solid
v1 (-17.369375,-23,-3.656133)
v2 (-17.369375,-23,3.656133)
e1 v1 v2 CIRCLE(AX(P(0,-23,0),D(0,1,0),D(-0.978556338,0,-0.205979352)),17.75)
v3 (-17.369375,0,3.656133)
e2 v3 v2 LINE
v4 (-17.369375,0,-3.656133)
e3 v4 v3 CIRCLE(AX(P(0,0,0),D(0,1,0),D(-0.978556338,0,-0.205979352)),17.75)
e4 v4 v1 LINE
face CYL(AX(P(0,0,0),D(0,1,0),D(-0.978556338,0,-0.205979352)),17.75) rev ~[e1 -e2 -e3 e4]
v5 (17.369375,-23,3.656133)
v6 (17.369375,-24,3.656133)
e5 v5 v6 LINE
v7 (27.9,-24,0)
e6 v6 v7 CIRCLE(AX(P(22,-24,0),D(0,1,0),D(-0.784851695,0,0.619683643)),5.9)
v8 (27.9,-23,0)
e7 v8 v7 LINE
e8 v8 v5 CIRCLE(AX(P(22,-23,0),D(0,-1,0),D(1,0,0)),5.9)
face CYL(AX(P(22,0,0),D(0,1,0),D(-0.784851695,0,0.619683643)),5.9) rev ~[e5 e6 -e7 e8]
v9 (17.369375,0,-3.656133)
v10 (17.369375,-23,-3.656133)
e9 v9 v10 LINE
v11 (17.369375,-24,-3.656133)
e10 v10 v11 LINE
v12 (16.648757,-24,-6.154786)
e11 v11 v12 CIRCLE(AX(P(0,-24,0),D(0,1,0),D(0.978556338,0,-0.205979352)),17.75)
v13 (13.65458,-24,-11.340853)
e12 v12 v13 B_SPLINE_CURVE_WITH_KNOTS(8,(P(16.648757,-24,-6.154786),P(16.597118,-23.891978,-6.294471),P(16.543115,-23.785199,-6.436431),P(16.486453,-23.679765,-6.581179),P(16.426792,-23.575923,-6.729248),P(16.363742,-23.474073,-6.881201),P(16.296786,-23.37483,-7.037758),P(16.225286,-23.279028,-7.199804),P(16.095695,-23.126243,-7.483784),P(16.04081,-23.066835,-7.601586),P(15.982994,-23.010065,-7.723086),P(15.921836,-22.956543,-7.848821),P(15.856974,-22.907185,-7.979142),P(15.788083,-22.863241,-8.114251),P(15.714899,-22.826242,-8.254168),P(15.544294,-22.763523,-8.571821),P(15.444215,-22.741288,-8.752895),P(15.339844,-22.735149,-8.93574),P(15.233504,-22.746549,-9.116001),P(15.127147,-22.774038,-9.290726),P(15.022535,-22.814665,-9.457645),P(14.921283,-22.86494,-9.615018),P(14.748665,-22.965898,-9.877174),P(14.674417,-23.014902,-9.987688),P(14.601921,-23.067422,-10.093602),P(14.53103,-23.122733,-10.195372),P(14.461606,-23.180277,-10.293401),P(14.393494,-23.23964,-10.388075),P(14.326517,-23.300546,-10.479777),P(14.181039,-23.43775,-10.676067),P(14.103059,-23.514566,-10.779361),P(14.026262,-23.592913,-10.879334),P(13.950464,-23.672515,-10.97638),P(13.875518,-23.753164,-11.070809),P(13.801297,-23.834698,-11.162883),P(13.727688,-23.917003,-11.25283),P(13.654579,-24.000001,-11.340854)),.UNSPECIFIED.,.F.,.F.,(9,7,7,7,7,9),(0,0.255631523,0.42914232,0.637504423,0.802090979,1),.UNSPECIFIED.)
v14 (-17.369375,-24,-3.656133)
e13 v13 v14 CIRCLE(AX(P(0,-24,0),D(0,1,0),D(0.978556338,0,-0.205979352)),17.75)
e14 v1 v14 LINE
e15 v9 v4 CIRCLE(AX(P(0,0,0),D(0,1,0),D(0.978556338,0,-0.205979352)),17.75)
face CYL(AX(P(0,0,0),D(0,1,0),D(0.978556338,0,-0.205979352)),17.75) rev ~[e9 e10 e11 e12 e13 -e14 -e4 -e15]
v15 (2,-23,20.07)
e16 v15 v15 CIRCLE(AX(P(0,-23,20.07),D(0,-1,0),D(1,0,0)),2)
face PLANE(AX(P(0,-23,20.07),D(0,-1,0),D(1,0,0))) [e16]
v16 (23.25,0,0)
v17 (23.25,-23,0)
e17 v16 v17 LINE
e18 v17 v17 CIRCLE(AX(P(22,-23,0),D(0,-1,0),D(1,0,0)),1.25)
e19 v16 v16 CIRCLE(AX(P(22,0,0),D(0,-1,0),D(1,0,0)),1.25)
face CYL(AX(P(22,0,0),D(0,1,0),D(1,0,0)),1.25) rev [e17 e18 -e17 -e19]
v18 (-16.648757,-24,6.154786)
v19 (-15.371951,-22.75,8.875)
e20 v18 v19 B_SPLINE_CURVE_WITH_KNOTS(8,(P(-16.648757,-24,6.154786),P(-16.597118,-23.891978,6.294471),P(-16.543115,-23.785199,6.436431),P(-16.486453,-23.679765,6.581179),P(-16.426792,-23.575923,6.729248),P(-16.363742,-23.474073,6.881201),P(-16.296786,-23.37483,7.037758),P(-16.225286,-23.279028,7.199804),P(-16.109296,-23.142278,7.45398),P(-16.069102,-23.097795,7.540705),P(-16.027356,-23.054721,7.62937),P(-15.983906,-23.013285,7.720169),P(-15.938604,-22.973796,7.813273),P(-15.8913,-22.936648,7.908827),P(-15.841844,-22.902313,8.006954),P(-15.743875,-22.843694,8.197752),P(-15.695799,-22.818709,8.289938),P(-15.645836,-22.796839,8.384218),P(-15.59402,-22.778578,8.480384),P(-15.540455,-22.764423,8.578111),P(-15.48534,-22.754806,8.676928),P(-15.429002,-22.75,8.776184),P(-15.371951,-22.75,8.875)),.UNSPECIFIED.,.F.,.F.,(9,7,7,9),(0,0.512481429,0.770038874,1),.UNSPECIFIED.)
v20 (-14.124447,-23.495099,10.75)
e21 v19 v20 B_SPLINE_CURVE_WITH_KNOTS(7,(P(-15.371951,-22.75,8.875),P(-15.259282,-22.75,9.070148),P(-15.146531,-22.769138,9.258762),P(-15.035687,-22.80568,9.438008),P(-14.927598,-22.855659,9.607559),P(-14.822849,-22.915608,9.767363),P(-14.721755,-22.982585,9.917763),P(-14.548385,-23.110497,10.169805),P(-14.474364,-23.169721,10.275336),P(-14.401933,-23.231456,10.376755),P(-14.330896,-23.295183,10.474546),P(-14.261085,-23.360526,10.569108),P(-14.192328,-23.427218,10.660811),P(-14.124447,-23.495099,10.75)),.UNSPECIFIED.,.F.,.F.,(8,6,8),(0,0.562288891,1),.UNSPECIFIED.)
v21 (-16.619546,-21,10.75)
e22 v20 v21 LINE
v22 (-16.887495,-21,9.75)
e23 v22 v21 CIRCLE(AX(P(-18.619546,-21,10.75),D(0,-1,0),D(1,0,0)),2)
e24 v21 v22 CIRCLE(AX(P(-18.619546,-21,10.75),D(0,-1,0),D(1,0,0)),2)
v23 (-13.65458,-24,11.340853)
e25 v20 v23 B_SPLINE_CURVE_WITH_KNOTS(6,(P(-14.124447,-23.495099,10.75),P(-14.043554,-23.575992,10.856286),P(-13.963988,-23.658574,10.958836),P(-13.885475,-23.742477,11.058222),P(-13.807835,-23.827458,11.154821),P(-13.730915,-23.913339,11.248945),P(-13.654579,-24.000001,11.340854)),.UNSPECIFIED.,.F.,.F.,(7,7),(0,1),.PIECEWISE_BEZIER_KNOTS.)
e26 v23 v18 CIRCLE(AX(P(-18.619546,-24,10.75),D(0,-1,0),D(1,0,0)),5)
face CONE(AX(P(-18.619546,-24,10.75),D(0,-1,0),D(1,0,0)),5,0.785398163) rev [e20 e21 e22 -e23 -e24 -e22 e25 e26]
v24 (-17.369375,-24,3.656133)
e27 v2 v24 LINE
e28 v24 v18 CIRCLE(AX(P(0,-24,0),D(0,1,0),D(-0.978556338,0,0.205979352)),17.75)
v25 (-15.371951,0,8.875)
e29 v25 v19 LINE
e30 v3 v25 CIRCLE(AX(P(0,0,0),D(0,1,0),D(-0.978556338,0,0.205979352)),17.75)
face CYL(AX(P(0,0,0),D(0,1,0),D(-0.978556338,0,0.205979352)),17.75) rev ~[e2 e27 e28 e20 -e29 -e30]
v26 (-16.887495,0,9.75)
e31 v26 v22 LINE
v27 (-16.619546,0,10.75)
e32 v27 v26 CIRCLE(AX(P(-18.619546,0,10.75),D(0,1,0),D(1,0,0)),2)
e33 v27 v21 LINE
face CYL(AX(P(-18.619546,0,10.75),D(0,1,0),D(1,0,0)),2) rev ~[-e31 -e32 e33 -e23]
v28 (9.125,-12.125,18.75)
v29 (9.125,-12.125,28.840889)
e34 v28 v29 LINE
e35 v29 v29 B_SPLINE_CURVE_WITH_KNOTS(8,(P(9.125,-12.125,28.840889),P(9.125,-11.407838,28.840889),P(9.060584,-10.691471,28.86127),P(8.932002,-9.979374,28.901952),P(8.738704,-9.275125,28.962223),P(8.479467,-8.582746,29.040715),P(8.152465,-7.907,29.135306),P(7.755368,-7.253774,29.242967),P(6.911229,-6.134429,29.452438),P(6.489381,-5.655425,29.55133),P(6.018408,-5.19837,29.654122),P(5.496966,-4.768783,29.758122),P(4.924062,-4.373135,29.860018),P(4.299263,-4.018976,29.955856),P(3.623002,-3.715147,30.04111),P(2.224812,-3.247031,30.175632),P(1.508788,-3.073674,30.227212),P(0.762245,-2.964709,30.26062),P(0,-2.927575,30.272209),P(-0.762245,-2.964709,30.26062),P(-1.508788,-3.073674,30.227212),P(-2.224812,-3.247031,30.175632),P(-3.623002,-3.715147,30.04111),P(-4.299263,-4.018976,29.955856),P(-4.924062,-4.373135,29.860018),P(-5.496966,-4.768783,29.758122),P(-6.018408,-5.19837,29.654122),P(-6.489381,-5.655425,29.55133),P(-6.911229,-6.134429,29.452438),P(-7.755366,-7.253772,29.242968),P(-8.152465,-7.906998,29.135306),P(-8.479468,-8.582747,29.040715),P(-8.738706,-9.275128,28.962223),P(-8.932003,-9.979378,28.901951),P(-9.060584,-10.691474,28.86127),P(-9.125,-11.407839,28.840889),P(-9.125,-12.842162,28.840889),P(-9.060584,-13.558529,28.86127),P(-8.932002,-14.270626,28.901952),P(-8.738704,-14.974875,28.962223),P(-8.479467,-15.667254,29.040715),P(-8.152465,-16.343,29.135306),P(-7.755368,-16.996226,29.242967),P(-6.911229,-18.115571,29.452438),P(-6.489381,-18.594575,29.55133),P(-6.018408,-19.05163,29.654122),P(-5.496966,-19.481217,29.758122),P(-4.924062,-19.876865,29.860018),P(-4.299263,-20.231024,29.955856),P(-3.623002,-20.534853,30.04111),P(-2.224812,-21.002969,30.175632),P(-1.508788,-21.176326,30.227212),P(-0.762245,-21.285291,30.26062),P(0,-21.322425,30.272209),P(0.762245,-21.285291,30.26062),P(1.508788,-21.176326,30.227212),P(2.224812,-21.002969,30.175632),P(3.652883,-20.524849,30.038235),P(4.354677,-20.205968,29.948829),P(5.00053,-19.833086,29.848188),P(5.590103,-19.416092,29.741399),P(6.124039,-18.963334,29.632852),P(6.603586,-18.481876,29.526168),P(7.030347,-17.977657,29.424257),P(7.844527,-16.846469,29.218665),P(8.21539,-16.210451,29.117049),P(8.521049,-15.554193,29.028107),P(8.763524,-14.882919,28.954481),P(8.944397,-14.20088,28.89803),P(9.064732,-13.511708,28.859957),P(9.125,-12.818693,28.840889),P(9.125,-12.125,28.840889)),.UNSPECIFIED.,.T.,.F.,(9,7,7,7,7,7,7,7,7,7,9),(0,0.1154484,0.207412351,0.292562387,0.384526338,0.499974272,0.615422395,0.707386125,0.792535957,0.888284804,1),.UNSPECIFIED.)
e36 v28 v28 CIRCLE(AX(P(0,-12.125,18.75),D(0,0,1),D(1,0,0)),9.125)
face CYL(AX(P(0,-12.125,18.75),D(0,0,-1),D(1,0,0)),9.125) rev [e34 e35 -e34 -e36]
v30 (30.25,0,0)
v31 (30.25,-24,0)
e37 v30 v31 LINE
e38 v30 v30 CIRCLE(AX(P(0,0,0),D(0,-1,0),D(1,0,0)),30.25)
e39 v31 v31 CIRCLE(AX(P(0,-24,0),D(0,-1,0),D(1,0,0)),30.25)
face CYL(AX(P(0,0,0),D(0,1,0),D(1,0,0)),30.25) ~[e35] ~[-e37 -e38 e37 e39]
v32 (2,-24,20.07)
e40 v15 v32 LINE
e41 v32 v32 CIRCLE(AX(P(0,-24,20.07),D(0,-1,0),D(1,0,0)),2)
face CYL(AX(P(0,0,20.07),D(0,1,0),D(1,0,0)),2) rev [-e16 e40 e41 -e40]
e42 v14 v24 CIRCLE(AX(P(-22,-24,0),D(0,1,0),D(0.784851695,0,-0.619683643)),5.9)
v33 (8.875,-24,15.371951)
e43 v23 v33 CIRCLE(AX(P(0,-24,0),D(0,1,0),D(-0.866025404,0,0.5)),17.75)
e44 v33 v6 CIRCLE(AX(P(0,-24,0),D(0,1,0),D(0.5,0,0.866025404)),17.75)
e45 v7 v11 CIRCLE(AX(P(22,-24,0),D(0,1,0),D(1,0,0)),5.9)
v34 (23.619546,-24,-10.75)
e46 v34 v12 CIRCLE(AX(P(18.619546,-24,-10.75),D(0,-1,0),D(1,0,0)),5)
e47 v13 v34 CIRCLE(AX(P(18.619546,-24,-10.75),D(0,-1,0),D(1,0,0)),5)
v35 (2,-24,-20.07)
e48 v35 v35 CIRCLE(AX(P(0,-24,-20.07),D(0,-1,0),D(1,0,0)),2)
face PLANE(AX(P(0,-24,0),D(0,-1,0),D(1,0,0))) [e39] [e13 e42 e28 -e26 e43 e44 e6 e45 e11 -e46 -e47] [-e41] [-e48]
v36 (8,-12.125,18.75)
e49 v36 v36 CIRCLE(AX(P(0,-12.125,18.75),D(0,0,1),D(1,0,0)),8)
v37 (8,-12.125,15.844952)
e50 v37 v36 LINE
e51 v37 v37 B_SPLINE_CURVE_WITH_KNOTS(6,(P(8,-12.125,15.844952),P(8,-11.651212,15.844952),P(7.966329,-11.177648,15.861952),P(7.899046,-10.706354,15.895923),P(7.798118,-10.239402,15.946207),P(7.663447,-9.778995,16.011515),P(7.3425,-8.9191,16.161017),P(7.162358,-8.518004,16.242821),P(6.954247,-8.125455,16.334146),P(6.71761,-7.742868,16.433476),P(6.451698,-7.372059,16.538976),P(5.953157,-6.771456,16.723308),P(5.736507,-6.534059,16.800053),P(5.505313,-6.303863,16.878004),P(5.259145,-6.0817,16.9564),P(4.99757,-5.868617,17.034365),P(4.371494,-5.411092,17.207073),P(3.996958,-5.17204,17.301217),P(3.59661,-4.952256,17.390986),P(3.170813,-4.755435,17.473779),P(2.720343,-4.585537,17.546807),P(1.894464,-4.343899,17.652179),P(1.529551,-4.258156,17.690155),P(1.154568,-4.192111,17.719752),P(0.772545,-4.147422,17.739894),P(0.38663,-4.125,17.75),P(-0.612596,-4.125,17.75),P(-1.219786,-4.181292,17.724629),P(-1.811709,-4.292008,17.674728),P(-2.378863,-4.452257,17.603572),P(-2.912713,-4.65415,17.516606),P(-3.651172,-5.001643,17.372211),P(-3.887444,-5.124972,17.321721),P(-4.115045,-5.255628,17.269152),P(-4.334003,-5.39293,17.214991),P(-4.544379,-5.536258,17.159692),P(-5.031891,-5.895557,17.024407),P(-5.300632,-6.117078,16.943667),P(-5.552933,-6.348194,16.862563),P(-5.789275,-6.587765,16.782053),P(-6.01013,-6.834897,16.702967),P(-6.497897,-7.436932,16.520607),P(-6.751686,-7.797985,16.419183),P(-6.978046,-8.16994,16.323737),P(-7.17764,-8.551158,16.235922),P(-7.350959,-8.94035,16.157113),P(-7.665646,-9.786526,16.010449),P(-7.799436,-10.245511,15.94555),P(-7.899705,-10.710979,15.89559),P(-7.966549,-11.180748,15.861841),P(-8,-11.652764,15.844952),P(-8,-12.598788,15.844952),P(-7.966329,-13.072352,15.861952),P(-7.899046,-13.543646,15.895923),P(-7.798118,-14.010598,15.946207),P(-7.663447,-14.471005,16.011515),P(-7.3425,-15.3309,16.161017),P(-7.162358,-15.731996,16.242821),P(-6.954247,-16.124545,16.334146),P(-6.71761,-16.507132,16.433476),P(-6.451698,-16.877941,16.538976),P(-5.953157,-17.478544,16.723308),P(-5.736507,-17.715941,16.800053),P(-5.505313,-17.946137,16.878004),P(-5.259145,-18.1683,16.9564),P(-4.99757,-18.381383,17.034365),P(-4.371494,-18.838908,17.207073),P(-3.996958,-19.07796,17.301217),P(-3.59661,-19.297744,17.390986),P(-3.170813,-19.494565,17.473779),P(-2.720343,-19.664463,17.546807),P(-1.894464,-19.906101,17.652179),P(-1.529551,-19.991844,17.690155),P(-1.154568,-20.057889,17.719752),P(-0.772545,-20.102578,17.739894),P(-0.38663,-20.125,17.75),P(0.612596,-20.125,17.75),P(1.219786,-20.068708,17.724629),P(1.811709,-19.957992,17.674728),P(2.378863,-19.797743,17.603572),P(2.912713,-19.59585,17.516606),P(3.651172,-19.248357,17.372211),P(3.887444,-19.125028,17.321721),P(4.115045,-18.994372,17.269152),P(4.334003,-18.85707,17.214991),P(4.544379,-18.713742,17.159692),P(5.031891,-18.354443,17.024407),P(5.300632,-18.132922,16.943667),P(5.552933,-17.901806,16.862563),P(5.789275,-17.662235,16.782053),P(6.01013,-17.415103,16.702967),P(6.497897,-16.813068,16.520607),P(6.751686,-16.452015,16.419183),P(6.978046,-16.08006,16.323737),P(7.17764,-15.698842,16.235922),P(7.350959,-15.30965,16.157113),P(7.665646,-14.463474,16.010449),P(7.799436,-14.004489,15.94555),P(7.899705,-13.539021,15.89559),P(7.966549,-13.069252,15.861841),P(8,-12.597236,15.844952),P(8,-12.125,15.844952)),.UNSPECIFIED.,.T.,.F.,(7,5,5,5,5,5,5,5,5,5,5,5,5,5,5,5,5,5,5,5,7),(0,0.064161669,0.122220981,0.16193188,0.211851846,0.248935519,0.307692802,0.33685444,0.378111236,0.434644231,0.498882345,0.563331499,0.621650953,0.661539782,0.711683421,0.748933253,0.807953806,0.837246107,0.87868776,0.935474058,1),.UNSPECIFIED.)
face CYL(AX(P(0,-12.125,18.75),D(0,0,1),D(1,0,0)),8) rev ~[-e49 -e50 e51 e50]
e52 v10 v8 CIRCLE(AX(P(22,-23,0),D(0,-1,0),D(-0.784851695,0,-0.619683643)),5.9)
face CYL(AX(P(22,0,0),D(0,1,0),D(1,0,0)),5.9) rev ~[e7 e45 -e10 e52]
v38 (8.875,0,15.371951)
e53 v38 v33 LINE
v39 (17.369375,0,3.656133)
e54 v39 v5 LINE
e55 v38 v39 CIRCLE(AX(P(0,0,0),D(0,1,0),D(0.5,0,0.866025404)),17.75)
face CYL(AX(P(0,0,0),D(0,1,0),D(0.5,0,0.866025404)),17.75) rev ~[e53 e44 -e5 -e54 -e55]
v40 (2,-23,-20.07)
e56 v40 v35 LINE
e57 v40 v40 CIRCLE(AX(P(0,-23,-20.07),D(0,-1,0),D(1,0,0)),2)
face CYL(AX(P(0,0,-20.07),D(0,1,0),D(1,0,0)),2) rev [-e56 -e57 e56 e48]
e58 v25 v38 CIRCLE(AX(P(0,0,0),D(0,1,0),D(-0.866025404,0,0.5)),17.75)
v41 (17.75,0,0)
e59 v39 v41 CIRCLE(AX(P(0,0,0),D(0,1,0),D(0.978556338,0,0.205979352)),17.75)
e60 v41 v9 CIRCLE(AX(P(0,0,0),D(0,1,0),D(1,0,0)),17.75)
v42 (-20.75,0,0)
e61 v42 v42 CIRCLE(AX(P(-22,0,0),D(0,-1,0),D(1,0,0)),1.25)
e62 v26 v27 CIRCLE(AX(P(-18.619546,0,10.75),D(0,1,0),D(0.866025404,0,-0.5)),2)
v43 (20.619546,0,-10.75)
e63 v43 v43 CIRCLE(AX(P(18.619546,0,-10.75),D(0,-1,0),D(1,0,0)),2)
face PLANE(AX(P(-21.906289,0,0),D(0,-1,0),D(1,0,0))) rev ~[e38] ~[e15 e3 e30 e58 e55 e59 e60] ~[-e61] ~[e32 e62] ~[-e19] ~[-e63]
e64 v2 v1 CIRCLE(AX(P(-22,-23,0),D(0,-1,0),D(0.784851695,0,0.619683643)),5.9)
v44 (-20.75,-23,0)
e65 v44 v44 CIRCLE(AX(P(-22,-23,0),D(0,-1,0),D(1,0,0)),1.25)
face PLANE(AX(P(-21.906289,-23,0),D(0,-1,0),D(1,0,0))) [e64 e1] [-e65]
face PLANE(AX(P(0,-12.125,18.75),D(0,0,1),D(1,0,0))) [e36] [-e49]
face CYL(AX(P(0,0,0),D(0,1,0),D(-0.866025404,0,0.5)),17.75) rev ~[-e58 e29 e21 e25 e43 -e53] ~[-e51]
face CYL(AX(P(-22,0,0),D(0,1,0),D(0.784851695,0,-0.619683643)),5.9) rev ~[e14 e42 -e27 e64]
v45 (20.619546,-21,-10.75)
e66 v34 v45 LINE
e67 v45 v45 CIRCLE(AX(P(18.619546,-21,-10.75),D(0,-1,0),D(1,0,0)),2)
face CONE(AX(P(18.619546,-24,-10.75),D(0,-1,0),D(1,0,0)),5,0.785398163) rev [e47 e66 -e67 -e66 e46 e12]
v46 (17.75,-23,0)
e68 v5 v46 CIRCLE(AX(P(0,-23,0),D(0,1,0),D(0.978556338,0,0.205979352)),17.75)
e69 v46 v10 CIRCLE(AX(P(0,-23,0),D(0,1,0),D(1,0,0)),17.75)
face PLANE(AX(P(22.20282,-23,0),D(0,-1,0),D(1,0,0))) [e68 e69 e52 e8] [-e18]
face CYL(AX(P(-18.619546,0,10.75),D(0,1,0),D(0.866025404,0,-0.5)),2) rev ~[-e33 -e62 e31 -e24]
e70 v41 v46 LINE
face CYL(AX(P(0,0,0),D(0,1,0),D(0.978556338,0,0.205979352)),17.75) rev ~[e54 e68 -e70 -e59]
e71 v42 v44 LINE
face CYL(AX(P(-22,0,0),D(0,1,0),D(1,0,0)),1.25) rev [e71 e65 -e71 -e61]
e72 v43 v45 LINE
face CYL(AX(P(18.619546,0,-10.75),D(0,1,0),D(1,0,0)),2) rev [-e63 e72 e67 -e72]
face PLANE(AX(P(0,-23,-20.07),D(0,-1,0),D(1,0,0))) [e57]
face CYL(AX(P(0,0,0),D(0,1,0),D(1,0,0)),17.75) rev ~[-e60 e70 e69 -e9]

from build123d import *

# Parameters (mm, degrees)
F0_R     = 30.25
F0_R_2   = 2
F1_DEPTH = 24
F0_R_3   = 1.25
F2_DEPTH = 23
F5_R     = 9.125
F5_R_2   = 8
F6_DEPTH = 25
F7_DEPTH = 15


# Not quite as in the source:
# - a fillet or chamfer that OpenCascade refuses, or shapes differently, is made with other operations: its cross-section is extruded or revolved along the edge and cut away or added


with BuildPart() as f1:
    # F0 (on Front) → F1 (new body)
    with BuildSketch(Plane.XZ):
        Circle(F0_R)
        with Locations((0, -20.07)):
            Circle(F0_R_2, mode=Mode.SUBTRACT)
        with Locations((18.6195461814, -10.75)):
            Circle(F0_R_2, mode=Mode.SUBTRACT)
        with BuildLine():
            ThreePointArc((-16.6195461814, 10.75), (-16.6876945288, 10.2323619098), (-16.8874953738, 9.75))
            ThreePointArc((-16.8874953738, 9.75), (-20.5513978339, 11.2676380902), (-16.6195461814, 10.75))
        make_face(mode=Mode.SUBTRACT)
        with BuildLine():
            ThreePointArc((8.875, 15.3719509172), (14.3703479176, 10.4190019065), (17.369375, 3.6561334917))
            ThreePointArc((17.369375, 3.6561334917), (23.9351114309, 5.5736293158), (27.9, 0))
            ThreePointArc((27.9, 0), (23.9351114309, -5.5736293158), (17.369375, -3.6561334917))
            ThreePointArc((17.369375, -3.6561334917), (0, -17.75), (-17.369375, -3.6561334917))
            ThreePointArc((-17.369375, -3.6561334917), (-27.9, 0), (-17.369375, 3.6561334917))
            ThreePointArc((-17.369375, 3.6561334917), (-16.5773263107, 6.3446632999), (-15.3719509172, 8.875))
            ThreePointArc((-15.3719509172, 8.875), (-4.5940380506, 17.1451834166), (8.875, 15.3719509172))
        make_face(mode=Mode.SUBTRACT)
        with Locations((0, 20.07)):
            Circle(F0_R_2, mode=Mode.SUBTRACT)
    extrude(amount=F1_DEPTH)

    # F0 (on Front) → F2 (join)
    with BuildSketch(Plane.XZ):
        with BuildLine():
            ThreePointArc((-17.369375, 3.6561334917), (-27.9, 0), (-17.369375, -3.6561334917))
            ThreePointArc((-17.369375, -3.6561334917), (-17.75, 0), (-17.369375, 3.6561334917))
        make_face()
        with Locations((-22, 0)):
            Circle(F0_R_3, mode=Mode.SUBTRACT)
        with Locations((0, 20.07)):
            Circle(F0_R_2)
        with BuildLine():
            ThreePointArc((17.369375, 3.6561334917), (17.6545873111, 1.8379463744), (17.75, 0))
            ThreePointArc((17.75, 0), (17.6545873111, -1.8379463744), (17.369375, -3.6561334917))
            ThreePointArc((17.369375, -3.6561334917), (23.9351114309, -5.5736293158), (27.9, 0))
            ThreePointArc((27.9, 0), (23.9351114309, 5.5736293158), (17.369375, 3.6561334917))
        make_face()
        with Locations((22, 0)):
            Circle(F0_R_3, mode=Mode.SUBTRACT)
        with Locations((0, -20.07)):
            Circle(F0_R_2)
    extrude(amount=F2_DEPTH)

    # F3: chamfer of 3 on 2 edges, made by hand

    # F3_s1 → F3_t2 (revolve, cut)
    with BuildSketch(Plane.XY.offset(10.75)):
        Polygon((-13.6195461814, -24), (-16.6195461814, -21), (-16.6195461814, -24), align=None)
    revolve(axis=Axis((-18.6195461814, -24, 10.75), (0, -1, 0)), mode=Mode.SUBTRACT)

    # F3_s3 → F3_t4 (revolve, cut)
    with BuildSketch(Plane.XY.offset(-10.75)):
        Polygon((23.6195461814, -24), (20.6195461814, -21), (20.6195461814, -24), align=None)
    revolve(axis=Axis((18.6195461814, -24, -10.75), (0, -1, 0)), mode=Mode.SUBTRACT)

    # F5 (on offset) → F6 (cut)
    with BuildSketch(Plane.XY.offset(18.75)):
        with Locations((0, -12.125)):
            Circle(F5_R)
        with Locations((0, -12.125)):
            Circle(F5_R_2, mode=Mode.SUBTRACT)
    extrude(amount=F6_DEPTH, mode=Mode.SUBTRACT)

    # F5 (on offset) → F7 (cut, symmetric)
    with BuildSketch(Plane.XY.offset(18.75)):
        with Locations((0, -12.125)):
            Circle(F5_R_2)
    extrude(amount=F7_DEPTH, both=True, mode=Mode.SUBTRACT)


solid = f1.part
